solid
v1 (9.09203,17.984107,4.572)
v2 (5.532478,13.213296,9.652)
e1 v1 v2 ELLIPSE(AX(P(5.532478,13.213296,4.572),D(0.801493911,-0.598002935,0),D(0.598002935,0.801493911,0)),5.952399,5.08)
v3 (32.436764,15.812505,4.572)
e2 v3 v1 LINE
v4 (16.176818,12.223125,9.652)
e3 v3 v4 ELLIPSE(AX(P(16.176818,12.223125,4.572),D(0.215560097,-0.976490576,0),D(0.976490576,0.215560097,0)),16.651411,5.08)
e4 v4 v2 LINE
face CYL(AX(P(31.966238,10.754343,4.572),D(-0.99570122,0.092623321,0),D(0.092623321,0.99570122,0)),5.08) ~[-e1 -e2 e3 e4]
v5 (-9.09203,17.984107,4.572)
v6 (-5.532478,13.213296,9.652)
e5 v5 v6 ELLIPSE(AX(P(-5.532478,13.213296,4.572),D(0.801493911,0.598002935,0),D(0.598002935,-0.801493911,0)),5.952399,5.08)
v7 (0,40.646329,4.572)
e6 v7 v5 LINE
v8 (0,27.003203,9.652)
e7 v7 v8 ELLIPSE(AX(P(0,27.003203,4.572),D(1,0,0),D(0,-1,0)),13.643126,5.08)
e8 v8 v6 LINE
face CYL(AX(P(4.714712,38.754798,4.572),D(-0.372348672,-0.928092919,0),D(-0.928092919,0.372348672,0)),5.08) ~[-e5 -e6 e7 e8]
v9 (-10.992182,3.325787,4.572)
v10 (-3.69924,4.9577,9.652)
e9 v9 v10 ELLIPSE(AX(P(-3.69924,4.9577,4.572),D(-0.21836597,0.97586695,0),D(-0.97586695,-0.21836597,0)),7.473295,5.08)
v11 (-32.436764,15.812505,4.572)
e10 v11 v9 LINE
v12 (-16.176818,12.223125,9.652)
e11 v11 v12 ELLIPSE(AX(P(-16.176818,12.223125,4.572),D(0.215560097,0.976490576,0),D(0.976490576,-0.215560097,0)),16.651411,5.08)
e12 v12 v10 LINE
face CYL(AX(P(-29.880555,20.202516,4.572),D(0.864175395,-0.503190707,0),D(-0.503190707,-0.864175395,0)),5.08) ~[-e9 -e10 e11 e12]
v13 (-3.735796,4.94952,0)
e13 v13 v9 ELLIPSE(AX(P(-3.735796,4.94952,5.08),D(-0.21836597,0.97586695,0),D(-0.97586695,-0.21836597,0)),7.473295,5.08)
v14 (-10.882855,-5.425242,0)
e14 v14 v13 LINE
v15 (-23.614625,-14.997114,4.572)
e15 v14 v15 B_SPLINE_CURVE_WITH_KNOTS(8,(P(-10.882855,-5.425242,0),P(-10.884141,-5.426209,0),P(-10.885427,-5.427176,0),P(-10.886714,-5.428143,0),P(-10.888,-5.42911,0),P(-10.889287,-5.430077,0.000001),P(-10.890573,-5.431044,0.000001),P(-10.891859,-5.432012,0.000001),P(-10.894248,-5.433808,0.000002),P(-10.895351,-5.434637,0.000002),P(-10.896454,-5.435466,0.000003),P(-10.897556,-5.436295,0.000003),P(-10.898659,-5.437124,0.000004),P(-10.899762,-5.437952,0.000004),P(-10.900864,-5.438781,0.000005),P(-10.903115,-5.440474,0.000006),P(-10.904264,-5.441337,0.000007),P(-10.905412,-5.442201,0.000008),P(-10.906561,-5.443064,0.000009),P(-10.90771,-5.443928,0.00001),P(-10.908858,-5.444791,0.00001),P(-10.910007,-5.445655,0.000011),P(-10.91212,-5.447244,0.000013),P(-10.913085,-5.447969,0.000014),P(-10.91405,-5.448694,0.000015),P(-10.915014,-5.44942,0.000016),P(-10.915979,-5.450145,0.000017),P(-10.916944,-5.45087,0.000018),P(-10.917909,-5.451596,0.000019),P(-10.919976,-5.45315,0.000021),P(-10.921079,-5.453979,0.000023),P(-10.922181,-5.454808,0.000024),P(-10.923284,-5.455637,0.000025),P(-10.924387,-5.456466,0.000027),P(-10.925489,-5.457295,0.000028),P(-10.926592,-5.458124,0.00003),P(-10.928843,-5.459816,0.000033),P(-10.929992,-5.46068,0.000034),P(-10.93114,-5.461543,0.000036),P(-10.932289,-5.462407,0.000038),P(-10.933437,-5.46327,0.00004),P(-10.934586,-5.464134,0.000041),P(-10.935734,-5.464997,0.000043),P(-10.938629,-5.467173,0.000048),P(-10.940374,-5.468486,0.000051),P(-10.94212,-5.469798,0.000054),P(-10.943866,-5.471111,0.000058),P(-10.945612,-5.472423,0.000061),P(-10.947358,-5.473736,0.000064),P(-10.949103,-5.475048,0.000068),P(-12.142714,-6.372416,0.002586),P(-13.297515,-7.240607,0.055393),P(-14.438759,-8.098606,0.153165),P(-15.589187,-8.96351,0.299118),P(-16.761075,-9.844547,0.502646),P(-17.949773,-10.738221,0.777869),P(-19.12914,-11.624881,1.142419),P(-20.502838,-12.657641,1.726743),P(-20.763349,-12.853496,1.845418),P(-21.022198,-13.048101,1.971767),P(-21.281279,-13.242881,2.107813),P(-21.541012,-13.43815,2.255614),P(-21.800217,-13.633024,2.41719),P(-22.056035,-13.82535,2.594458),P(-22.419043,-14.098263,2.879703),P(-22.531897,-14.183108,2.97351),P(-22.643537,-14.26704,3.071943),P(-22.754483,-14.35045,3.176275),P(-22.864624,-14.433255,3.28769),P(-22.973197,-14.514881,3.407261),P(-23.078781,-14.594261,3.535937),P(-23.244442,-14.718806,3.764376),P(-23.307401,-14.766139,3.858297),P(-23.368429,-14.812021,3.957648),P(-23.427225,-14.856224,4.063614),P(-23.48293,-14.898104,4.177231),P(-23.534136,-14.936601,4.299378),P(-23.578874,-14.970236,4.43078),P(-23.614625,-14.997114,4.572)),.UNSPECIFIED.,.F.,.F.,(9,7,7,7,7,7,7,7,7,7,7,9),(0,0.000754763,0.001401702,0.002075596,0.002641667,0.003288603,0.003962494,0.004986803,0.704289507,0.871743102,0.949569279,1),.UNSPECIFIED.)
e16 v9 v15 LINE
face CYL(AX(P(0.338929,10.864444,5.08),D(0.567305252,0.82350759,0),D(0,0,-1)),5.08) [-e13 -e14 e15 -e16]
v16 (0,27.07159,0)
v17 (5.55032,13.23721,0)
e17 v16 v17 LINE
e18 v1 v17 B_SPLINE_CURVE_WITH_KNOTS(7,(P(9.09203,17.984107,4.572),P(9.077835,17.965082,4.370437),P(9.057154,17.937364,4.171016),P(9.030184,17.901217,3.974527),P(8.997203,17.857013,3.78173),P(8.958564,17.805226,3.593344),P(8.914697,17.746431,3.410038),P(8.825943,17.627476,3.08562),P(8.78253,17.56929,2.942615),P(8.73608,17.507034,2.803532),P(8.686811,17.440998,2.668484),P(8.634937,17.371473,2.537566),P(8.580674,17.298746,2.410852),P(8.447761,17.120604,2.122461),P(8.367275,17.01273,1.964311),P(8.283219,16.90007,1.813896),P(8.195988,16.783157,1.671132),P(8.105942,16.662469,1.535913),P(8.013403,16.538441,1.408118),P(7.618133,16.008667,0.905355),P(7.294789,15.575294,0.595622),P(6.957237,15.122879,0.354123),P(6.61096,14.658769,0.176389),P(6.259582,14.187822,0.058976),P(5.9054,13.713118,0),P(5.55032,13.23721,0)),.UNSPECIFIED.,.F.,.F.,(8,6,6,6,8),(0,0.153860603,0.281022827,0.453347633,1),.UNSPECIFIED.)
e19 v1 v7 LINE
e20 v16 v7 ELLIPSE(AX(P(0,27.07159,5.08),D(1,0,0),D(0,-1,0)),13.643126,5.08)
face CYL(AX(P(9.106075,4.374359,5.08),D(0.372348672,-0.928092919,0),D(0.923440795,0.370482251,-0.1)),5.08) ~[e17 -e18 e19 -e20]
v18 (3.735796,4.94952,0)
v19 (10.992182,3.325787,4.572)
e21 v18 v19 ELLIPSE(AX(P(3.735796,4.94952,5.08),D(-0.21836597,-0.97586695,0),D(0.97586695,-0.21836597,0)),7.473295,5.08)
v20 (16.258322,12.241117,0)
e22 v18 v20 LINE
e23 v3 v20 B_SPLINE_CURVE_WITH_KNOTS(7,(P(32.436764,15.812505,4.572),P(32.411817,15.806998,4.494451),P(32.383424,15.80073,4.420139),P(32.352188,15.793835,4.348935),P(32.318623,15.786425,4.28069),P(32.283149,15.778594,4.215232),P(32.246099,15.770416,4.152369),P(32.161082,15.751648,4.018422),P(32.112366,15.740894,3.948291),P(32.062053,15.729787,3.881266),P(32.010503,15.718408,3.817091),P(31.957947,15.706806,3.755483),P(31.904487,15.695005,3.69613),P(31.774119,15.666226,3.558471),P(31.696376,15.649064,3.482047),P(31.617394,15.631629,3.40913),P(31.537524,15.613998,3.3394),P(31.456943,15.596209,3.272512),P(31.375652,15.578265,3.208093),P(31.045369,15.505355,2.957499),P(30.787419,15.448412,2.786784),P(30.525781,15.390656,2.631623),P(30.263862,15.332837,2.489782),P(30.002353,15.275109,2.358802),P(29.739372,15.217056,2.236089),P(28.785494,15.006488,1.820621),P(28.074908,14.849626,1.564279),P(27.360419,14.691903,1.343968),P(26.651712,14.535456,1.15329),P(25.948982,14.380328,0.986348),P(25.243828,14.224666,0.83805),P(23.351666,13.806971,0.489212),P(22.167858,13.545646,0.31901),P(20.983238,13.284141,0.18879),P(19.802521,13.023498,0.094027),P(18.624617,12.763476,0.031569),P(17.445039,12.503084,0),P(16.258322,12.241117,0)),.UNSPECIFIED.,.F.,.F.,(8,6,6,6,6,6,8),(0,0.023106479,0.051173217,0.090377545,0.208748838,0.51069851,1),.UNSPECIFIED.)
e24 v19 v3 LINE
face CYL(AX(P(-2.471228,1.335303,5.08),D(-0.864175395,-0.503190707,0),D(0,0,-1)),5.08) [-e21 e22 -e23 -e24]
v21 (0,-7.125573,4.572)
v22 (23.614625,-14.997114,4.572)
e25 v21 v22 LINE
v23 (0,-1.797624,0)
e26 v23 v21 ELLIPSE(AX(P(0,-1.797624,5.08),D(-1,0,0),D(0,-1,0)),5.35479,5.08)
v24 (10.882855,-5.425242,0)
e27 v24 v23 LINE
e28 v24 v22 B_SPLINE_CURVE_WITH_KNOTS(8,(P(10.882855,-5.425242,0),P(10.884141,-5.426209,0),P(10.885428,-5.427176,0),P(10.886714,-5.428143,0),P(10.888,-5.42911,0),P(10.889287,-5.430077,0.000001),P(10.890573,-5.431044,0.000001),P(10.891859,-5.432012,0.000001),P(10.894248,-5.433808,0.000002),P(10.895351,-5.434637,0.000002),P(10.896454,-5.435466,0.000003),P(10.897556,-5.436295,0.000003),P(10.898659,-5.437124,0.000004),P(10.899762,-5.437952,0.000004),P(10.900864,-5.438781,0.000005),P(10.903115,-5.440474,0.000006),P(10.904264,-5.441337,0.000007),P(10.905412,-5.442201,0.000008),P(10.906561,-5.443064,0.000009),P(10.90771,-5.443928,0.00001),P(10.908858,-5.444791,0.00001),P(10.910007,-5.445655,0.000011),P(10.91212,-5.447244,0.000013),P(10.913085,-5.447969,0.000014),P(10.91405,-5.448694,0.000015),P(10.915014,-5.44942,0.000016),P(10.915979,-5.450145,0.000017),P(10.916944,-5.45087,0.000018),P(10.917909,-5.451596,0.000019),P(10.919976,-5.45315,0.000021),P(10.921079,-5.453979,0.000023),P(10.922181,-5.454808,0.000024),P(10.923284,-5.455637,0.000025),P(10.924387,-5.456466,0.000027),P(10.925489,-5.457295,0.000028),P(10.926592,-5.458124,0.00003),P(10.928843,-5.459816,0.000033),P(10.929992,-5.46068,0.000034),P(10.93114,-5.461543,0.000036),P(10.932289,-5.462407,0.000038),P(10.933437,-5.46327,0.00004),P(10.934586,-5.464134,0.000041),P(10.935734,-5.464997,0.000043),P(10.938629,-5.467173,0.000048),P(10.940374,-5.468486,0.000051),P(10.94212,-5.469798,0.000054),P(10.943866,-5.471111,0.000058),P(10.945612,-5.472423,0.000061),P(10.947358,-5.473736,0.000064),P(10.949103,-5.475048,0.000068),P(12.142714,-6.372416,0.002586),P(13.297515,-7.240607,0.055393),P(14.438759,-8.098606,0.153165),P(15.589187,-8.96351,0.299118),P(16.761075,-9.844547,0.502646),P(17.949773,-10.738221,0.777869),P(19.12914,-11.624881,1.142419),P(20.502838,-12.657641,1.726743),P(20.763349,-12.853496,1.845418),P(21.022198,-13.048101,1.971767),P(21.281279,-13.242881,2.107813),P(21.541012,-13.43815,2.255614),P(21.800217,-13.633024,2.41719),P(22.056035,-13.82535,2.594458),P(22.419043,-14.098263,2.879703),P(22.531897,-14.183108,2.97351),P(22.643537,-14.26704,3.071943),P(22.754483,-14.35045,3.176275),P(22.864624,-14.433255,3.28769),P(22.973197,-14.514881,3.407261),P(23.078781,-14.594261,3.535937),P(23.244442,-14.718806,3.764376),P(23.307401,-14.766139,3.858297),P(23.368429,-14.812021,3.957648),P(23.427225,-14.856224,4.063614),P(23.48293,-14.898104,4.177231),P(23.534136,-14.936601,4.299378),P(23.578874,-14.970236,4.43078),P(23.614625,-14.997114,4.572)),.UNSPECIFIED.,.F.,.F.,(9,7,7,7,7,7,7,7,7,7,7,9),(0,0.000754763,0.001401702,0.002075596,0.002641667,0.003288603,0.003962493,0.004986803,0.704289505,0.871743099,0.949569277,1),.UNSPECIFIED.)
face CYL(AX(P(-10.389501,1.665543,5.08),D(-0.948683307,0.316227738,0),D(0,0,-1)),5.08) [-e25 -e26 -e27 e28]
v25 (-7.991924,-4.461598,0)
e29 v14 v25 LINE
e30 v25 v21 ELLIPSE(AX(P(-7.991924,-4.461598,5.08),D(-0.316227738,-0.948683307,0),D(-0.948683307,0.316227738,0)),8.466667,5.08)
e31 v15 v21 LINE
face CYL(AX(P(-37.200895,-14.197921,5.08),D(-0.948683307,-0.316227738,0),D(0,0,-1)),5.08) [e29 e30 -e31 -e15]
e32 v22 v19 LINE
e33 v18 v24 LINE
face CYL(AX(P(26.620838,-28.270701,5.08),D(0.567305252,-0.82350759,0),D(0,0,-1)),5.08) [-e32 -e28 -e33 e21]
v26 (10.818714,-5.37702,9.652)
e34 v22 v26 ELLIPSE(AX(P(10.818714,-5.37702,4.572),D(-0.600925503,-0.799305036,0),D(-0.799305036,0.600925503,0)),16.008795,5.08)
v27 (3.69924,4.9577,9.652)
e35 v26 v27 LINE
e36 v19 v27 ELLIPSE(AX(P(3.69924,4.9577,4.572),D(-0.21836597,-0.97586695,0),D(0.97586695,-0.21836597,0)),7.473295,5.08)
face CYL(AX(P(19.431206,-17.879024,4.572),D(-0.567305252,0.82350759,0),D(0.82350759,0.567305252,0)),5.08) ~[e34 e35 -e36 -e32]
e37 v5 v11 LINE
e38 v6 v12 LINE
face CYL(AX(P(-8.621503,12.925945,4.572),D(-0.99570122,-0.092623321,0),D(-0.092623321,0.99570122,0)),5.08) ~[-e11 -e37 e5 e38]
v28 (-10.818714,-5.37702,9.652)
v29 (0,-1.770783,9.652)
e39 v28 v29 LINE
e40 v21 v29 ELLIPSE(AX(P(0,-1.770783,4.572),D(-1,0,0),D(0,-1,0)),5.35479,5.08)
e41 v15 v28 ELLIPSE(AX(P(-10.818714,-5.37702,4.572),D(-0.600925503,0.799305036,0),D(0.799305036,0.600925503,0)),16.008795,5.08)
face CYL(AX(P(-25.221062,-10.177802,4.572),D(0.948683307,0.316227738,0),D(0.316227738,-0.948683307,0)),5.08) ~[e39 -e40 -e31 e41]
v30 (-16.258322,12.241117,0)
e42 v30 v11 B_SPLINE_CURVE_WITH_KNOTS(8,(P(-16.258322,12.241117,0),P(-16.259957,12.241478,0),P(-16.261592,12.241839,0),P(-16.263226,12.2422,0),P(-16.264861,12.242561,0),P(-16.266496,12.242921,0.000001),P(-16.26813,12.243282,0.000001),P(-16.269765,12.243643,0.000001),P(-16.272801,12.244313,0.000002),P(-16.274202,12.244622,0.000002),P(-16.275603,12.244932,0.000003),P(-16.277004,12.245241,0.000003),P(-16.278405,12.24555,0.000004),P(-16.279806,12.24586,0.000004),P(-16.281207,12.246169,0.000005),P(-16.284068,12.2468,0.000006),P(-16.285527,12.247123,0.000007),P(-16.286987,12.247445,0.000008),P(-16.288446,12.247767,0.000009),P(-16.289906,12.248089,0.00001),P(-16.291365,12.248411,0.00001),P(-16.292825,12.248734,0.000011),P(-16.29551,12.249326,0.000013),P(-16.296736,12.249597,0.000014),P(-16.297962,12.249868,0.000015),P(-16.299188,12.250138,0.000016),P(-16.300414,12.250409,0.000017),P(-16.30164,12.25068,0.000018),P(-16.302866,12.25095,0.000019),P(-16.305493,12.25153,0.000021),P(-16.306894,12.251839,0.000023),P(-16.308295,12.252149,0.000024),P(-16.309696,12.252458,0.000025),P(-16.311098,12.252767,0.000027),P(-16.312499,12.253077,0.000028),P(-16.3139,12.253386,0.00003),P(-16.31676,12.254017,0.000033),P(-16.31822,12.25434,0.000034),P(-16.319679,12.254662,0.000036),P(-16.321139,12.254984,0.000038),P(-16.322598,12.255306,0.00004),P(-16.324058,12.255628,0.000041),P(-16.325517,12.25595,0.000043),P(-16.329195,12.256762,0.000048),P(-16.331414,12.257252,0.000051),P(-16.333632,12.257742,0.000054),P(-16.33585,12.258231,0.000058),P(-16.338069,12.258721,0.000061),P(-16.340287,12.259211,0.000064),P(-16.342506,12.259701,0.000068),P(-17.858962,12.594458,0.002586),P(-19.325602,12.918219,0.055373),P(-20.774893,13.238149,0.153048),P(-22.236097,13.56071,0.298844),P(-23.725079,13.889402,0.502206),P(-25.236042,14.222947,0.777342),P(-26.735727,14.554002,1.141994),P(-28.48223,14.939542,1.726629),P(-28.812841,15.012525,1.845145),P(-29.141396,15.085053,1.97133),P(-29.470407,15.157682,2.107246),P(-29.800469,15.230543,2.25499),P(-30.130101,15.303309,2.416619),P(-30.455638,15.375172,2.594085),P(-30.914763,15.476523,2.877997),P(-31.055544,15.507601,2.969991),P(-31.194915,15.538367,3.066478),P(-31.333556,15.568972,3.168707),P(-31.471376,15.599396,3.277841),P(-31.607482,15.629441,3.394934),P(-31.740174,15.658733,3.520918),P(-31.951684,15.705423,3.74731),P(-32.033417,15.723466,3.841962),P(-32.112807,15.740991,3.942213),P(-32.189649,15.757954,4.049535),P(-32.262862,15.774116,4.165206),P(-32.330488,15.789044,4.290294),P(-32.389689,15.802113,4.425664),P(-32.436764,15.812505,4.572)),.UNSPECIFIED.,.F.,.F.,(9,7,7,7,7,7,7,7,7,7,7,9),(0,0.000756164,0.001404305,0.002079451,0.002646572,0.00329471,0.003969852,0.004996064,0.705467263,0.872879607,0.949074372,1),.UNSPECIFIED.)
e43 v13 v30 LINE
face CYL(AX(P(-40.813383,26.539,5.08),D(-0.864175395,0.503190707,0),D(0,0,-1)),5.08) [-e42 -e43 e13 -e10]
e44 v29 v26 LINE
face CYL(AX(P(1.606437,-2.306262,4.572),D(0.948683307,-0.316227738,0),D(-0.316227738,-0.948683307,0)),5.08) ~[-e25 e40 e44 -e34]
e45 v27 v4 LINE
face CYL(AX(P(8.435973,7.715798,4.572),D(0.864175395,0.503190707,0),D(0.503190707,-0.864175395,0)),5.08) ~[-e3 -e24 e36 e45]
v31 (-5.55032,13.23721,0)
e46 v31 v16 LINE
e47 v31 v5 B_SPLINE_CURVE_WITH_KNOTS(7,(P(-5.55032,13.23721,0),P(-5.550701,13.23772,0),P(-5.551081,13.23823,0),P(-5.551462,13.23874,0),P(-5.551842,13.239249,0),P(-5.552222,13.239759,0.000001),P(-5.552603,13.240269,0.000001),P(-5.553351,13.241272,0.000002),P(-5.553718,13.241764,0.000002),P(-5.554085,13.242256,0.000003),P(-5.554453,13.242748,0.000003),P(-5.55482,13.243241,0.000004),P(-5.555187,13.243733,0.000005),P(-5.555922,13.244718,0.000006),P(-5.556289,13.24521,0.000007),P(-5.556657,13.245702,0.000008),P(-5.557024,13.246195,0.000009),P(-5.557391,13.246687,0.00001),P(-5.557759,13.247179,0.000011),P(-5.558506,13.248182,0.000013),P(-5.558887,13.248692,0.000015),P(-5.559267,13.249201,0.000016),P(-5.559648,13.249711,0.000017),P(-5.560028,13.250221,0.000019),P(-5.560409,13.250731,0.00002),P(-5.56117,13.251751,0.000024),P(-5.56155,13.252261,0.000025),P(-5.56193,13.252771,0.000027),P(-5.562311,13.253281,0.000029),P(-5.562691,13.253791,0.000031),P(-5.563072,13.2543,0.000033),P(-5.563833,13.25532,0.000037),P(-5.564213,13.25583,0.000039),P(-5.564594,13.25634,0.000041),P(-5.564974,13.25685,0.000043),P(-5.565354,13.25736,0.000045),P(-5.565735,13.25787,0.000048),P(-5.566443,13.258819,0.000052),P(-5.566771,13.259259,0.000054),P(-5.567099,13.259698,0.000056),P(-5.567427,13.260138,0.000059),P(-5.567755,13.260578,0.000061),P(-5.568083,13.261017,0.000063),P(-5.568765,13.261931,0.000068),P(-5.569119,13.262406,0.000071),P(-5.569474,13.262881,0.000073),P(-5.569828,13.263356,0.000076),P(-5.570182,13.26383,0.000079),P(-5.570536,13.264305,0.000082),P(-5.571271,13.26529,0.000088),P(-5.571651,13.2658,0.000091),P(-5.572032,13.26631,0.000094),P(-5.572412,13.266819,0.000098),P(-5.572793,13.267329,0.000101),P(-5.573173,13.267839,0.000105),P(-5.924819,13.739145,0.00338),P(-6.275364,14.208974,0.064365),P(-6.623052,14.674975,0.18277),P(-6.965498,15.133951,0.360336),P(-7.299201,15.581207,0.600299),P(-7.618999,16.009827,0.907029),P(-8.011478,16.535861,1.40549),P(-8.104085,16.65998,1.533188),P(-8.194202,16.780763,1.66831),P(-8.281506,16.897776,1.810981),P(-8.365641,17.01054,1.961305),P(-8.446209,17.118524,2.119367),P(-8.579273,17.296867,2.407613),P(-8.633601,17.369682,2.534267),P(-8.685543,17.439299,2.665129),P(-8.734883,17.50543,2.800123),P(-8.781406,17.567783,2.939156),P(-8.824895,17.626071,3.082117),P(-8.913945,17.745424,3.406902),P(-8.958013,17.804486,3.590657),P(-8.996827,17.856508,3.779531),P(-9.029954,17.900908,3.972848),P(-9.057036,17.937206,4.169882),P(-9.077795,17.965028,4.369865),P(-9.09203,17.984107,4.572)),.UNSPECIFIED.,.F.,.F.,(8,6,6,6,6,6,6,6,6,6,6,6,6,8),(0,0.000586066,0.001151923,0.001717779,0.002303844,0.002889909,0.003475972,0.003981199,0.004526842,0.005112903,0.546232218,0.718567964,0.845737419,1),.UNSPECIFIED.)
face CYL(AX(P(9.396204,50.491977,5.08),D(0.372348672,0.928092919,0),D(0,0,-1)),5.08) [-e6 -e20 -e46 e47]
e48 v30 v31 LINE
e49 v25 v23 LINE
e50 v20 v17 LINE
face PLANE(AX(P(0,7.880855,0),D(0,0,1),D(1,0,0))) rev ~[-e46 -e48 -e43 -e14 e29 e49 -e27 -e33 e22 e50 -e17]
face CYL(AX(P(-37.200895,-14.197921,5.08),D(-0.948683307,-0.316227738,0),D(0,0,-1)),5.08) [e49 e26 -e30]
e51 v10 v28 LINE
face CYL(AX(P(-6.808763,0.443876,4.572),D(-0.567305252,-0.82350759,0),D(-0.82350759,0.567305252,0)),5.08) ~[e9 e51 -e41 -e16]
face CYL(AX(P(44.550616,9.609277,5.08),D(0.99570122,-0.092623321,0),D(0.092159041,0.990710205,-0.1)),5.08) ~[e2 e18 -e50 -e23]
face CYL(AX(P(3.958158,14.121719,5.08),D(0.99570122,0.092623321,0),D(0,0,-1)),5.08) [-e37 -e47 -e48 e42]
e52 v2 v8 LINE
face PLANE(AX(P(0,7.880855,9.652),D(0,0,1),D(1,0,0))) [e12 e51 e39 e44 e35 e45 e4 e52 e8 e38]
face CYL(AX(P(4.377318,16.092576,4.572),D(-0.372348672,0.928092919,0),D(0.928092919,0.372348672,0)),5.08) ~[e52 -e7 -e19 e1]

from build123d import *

# Parameters (mm, degrees)
F1_DEPTH      = 9.652
F2_R          = 5.08
F3_T4_DEPTH   = 48.7182027165
F3_T9_DEPTH   = 49.6907337444
F3_T14_DEPTH  = 49.6907337444
F3_T19_DEPTH  = 48.7182027165
F3_T24_DEPTH  = 50.0877618637
F3_T29_DEPTH  = 47.5225066811
F3_T34_DEPTH  = 50.1646809025
F3_T39_DEPTH  = 50.1646809025
F3_T44_DEPTH  = 47.5225066811
F3_T49_DEPTH  = 50.0877618637
F3_T55_DEPTH  = 49.6907337444
F3_T59_DEPTH  = 48.7182027165
F3_T66_DEPTH  = 49.6907337444
F3_T70_DEPTH  = 48.7182027165
F3_T77_DEPTH  = 50.0877618637
F3_T81_DEPTH  = 47.5225066811
F3_T88_DEPTH  = 50.1646809025
F3_T92_DEPTH  = 50.1646809025
F3_T99_DEPTH  = 47.5225066811
F3_T103_DEPTH = 50.0877618637


# Not quite as in the source:
# - a fillet or chamfer that OpenCascade refuses, or shapes differently, is made with other operations: its cross-section is extruded or revolved along the edge and cut away or added


with BuildPart() as f1:
    # F0 (on Top) → F1 (new body)
    with BuildSketch(Plane.XY):
        Polygon((9.0920295568, 17.9841070124), (0, 40.6463289496), (-9.0920295568, 17.9841070124), (-32.4367642404, 15.8125049123), (-10.9921818601, 3.3257867829), (-23.6146248879, -14.9971136204), (0, -7.1255727671), (23.6146248879, -14.9971136204), (10.9921818601, 3.3257867829), (32.4367642404, 15.8125049123), align=None)
    extrude(amount=F1_DEPTH)

    # F2
    f2_edges = [f1.edges().sort_by_distance(p)[0] for p in [
        (21.714473, 9.569146, 9.652),
        (17.303403, -5.835663, 9.652),
        (11.807312, -11.061343, 9.652),
        (-11.807312, -11.061343, 9.652),
        (-17.303403, -5.835663, 9.652),
        (-21.714473, 9.569146, 9.652),
        (-4.546015, 29.315218, 9.652),
        (4.546015, 29.315218, 9.652),
        (20.764397, 16.898306, 9.652),
        (-20.764397, 16.898306, 9.652),
    ]]
    fillet(f2_edges, radius=F2_R)

    # F3: fillet of radius 5.08 on 10 edges, made by hand


with BuildPart() as f3_tool2:
    # F3_s3 → F3_t4 (new body)
    with BuildSketch(Plane(origin=(43.2821955638, -4.026248662, 0), x_dir=(0, 0, 1), z_dir=(-0.9957012204, 0.0926233213, 0))):
        with BuildLine():
            ThreePointArc((4.572, 18.7489312754), (1.3125711686, 17.1021626927), (0, 13.6943950949))
            Line((0, 13.6943950949), (-0.1016, 13.6943950949))
            Line((-0.1016, 13.6943950949), (-0.1016, 18.7489312754))
            Line((-0.1016, 18.7489312754), (0, 18.8505312754))
            ThreePointArc((0, 18.8505312754), (2.286, 18.8505312754), (4.56184, 18.8500219991))
            Line((4.56184, 18.8500219991), (4.572, 18.7489312754))
        make_face()
    extrude(amount=F3_T4_DEPTH)

    split(bisect_by=Plane(origin=(14.046321235, 5.6353506813, 0), x_dir=(0, 0, 1), z_dir=(0.928092919, 0.3723486723, 0)), keep=Keep.TOP)


with BuildPart() as f1_1:
    add(f1.part)

    # F3_t1: cut F3_tool2
    add(f3_tool2.part, mode=Mode.SUBTRACT)


with BuildPart() as f3_tool7:
    # F3_s8 → F3_t9 (new body)
    with BuildSketch(Plane(origin=(-0.2491670879, 0.6210582369, 0), x_dir=(0, 0, 1), z_dir=(-0.3723486723, 0.928092919, 0))):
        with BuildLine():
            ThreePointArc((4.572, 15.1346066199), (1.3125711686, 13.4878380371), (0, 10.0800704394))
            Line((0, 10.0800704394), (-0.1016, 10.0800704394))
            Line((-0.1016, 10.0800704394), (-0.1016, 15.1346066199))
            Line((-0.1016, 15.1346066199), (0, 15.2362066199))
            ThreePointArc((0, 15.2362066199), (2.286, 15.2362066199), (4.56184, 15.2356973435))
            Line((4.56184, 15.2356973435), (4.572, 15.1346066199))
        make_face()
    extrude(amount=F3_T9_DEPTH)

    split(bisect_by=Plane(origin=(1.7365882856, 18.6683337526, 0), x_dir=(0, 0, 1), z_dir=(0.0926233213, 0.9957012204, 0)), keep=Keep.TOP)


with BuildPart() as f1_2:
    add(f1_1.part)

    # F3_t6: cut F3_tool7
    add(f3_tool7.part, mode=Mode.SUBTRACT)


with BuildPart() as f3_tool12:
    # F3_s13 → F3_t14 (new body)
    with BuildSketch(Plane(origin=(18.7514458253, 46.7386763625, 0), x_dir=(0, 0, 1), z_dir=(-0.3723486723, -0.928092919, 0))):
        with BuildLine():
            ThreePointArc((0, 10.0800704394), (1.3125711686, 13.4878380371), (4.572, 15.1346066199))
            Line((4.572, 15.1346066199), (4.56184, 15.2356973435))
            ThreePointArc((4.56184, 15.2356973435), (2.286, 15.2362066199), (0, 15.2362066199))
            Line((0, 15.2362066199), (-0.1016, 15.1346066199))
            Line((-0.1016, 15.1346066199), (-0.1016, 10.0800704394))
            Line((-0.1016, 10.0800704394), (0, 10.0800704394))
        make_face()
    extrude(amount=F3_T14_DEPTH)

    split(bisect_by=Plane(origin=(-1.7365882856, 18.6683337526, 0), x_dir=(0, 0, 1), z_dir=(-0.0926233213, 0.9957012204, 0)), keep=Keep.TOP)


with BuildPart() as f1_3:
    add(f1_2.part)

    # F3_t11: cut F3_tool12
    add(f3_tool12.part, mode=Mode.SUBTRACT)


with BuildPart() as f3_tool17:
    # F3_s18 → F3_t19 (new body)
    with BuildSketch(Plane(origin=(5.2265783378, 0.4861930816, 0), x_dir=(0, 0, 1), z_dir=(-0.9957012204, -0.0926233213, 0))):
        with BuildLine():
            ThreePointArc((0, 13.6943950949), (1.3125711686, 17.1021626927), (4.572, 18.7489312754))
            Line((4.572, 18.7489312754), (4.56184, 18.8500219991))
            ThreePointArc((4.56184, 18.8500219991), (2.286, 18.8505312754), (0, 18.8505312754))
            Line((0, 18.8505312754), (-0.1016, 18.7489312754))
            Line((-0.1016, 18.7489312754), (-0.1016, 13.6943950949))
            Line((-0.1016, 13.6943950949), (0, 13.6943950949))
        make_face()
    extrude(amount=F3_T19_DEPTH)

    split(bisect_by=Plane(origin=(-14.046321235, 5.6353506813, 0), x_dir=(0, 0, 1), z_dir=(-0.928092919, 0.3723486723, 0)), keep=Keep.TOP)


with BuildPart() as f1_4:
    add(f1_3.part)

    # F3_t16: cut F3_tool17
    add(f3_tool17.part, mode=Mode.SUBTRACT)


with BuildPart() as f3_tool22:
    # F3_s23 → F3_t24 (new body)
    with BuildSketch(Plane(origin=(-42.019750379, 24.4671950025, 0), x_dir=(0, 0, 1), z_dir=(0.8641753945, -0.5031907068, 0))):
        with BuildLine():
            ThreePointArc((0, -2.3974355258), (1.3125711686, 1.0103320719), (4.572, 2.6571006547))
            Line((4.572, 2.6571006547), (4.56184, 2.7581913783))
            ThreePointArc((4.56184, 2.7581913783), (2.286, 2.7587006547), (0, 2.7587006547))
            Line((0, 2.7587006547), (-0.1016, 2.6571006547))
            Line((-0.1016, 2.6571006547), (-0.1016, -2.3974355258))
            Line((-0.1016, -2.3974355258), (0, -2.3974355258))
        make_face()
    extrude(amount=F3_T24_DEPTH)

    split(bisect_by=Plane(origin=(-9.0082519421, 6.2056849307, 0), x_dir=(0, 0, 1), z_dir=(-0.8235075899, 0.5673052523, 0)), keep=Keep.TOP)


with BuildPart() as f1_5:
    add(f1_4.part)

    # F3_t21: cut F3_tool22
    add(f3_tool22.part, mode=Mode.SUBTRACT)


with BuildPart() as f3_tool27:
    # F3_s28 → F3_t29 (new body)
    with BuildSketch(Plane(origin=(5.1847323903, 7.5262241228, 0), x_dir=(0, 0, 1), z_dir=(-0.5673052523, -0.8235075899, 0))):
        with BuildLine():
            ThreePointArc((0, 5.8843453213), (1.3125711686, 9.292112919), (4.572, 10.9388815018))
            Line((4.572, 10.9388815018), (4.56184, 11.0399722254))
            ThreePointArc((4.56184, 11.0399722254), (2.286, 11.0404815018), (0, 11.0404815018))
            Line((0, 11.0404815018), (-0.1016, 10.9388815018))
            Line((-0.1016, 10.9388815018), (-0.1016, 5.8843453213))
            Line((-0.1016, 5.8843453213), (0, 5.8843453213))
        make_face()
    extrude(amount=F3_T29_DEPTH)

    split(bisect_by=Plane(origin=(-1.3370283566, -2.2962010066, 0), x_dir=(0, 0, 1), z_dir=(-0.5031907068, -0.8641753945, 0)), keep=Keep.TOP)


with BuildPart() as f1_6:
    add(f1_5.part)

    # F3_t26: cut F3_tool27
    add(f3_tool27.part, mode=Mode.SUBTRACT)


with BuildPart() as f3_tool32:
    # F3_s33 → F3_t34 (new body)
    with BuildSketch(Plane(origin=(-37.7401818022, -12.5800593605, 0), x_dir=(0, 0, 1), z_dir=(0.9486833074, 0.316227738, 0))):
        with BuildLine():
            ThreePointArc((0, 1.7053757593), (1.3125711686, 5.1131433571), (4.572, 6.7599119398))
            Line((4.572, 6.7599119398), (4.56184, 6.8610026635))
            ThreePointArc((4.56184, 6.8610026635), (2.286, 6.8615119398), (0, 6.8615119398))
            Line((0, 6.8615119398), (-0.1016, 6.7599119398))
            Line((-0.1016, 6.7599119398), (-0.1016, 1.7053757593))
            Line((-0.1016, 1.7053757593), (0, 1.7053757593))
        make_face()
    extrude(amount=F3_T34_DEPTH)

    split(bisect_by=Plane(origin=(-2.1376716615, -6.4130156168, 0), x_dir=(0, 0, 1), z_dir=(-0.316227738, -0.9486833074, 0)), keep=Keep.TOP)


with BuildPart() as f1_7:
    add(f1_6.part)

    # F3_t31: cut F3_tool32
    add(f3_tool32.part, mode=Mode.SUBTRACT)


with BuildPart() as f3_tool37:
    # F3_s38 → F3_t39 (new body)
    with BuildSketch(Plane(origin=(-9.8502135912, 3.2834042067, 0), x_dir=(0, 0, 1), z_dir=(0.9486833074, -0.316227738, 0))):
        with BuildLine():
            ThreePointArc((0, 1.7053757593), (1.3125711686, 5.1131433571), (4.572, 6.7599119398))
            Line((4.572, 6.7599119398), (4.56184, 6.8610026635))
            ThreePointArc((4.56184, 6.8610026635), (2.286, 6.8615119398), (0, 6.8615119398))
            Line((0, 6.8615119398), (-0.1016, 6.7599119398))
            Line((-0.1016, 6.7599119398), (-0.1016, 1.7053757593))
            Line((-0.1016, 1.7053757593), (0, 1.7053757593))
        make_face()
    extrude(amount=F3_T39_DEPTH)

    split(bisect_by=Plane(origin=(2.1376716615, -6.4130156168, 0), x_dir=(0, 0, 1), z_dir=(0.316227738, -0.9486833074, 0)), keep=Keep.TOP)


with BuildPart() as f1_8:
    add(f1_7.part)

    # F3_t36: cut F3_tool37
    add(f3_tool37.part, mode=Mode.SUBTRACT)


with BuildPart() as f3_tool42:
    # F3_s43 → F3_t44 (new body)
    with BuildSketch(Plane(origin=(21.7750352542, -31.6089208215, 0), x_dir=(0, 0, 1), z_dir=(-0.5673052523, 0.8235075899, 0))):
        with BuildLine():
            ThreePointArc((0, 5.8843453213), (1.3125711686, 9.292112919), (4.572, 10.9388815018))
            Line((4.572, 10.9388815018), (4.56184, 11.0399722254))
            ThreePointArc((4.56184, 11.0399722254), (2.286, 11.0404815018), (0, 11.0404815018))
            Line((0, 11.0404815018), (-0.1016, 10.9388815018))
            Line((-0.1016, 10.9388815018), (-0.1016, 5.8843453213))
            Line((-0.1016, 5.8843453213), (0, 5.8843453213))
        make_face()
    extrude(amount=F3_T44_DEPTH)

    split(bisect_by=Plane(origin=(1.3370283566, -2.2962010066, 0), x_dir=(0, 0, 1), z_dir=(0.5031907068, -0.8641753945, 0)), keep=Keep.TOP)


with BuildPart() as f1_9:
    add(f1_8.part)

    # F3_t41: cut F3_tool42
    add(f3_tool42.part, mode=Mode.SUBTRACT)


with BuildPart() as f3_tool47:
    # F3_s48 → F3_t49 (new body)
    with BuildSketch(Plane(origin=(-1.2648609916, -0.7365012941, 0), x_dir=(0, 0, 1), z_dir=(0.8641753945, 0.5031907068, 0))):
        with BuildLine():
            ThreePointArc((0, -2.3974355258), (1.3125711686, 1.0103320719), (4.572, 2.6571006547))
            Line((4.572, 2.6571006547), (4.56184, 2.7581913783))
            ThreePointArc((4.56184, 2.7581913783), (2.286, 2.7587006547), (0, 2.7587006547))
            Line((0, 2.7587006547), (-0.1016, 2.6571006547))
            Line((-0.1016, 2.6571006547), (-0.1016, -2.3974355258))
            Line((-0.1016, -2.3974355258), (0, -2.3974355258))
        make_face()
    extrude(amount=F3_T49_DEPTH)

    split(bisect_by=Plane(origin=(9.0082519421, 6.2056849307, 0), x_dir=(0, 0, 1), z_dir=(0.8235075899, 0.5673052523, 0)), keep=Keep.TOP)


with BuildPart() as f1_10:
    add(f1_9.part)

    # F3_t46: cut F3_tool47
    add(f3_tool47.part, mode=Mode.SUBTRACT)


with BuildPart() as f3_tool53:
    # F3_s54 → F3_t55 (new body)
    with BuildSketch(Plane(origin=(-0.2491670879, 0.6210582369, 0), x_dir=(0, 0, 1), z_dir=(-0.3723486723, 0.928092919, 0))):
        with BuildLine():
            ThreePointArc((4.572, 15.1346066199), (1.3125711686, 13.4878380371), (0, 10.0800704394))
            Line((0, 10.0800704394), (-0.1016, 10.0800704394))
            Line((-0.1016, 10.0800704394), (-0.1016, 15.1346066199))
            Line((-0.1016, 15.1346066199), (0, 15.2362066199))
            ThreePointArc((0, 15.2362066199), (2.286, 15.2362066199), (4.56184, 15.2356973435))
            Line((4.56184, 15.2356973435), (4.572, 15.1346066199))
        make_face()
    extrude(amount=F3_T55_DEPTH)

    split(bisect_by=Plane(origin=(1.7365882856, 18.6683337526, 0), x_dir=(0, 0, 1), z_dir=(-0.0926233213, -0.9957012204, 0)), keep=Keep.TOP)


with BuildPart() as f3_tool57:
    # F3_s58 → F3_t59 (new body)
    with BuildSketch(Plane(origin=(43.2821955638, -4.026248662, 0), x_dir=(0, 0, 1), z_dir=(-0.9957012204, 0.0926233213, 0))):
        with BuildLine():
            ThreePointArc((4.572, 18.7489312754), (1.3125711686, 17.1021626927), (0, 13.6943950949))
            Line((0, 13.6943950949), (-0.1016, 13.6943950949))
            Line((-0.1016, 13.6943950949), (-0.1016, 18.7489312754))
            Line((-0.1016, 18.7489312754), (0, 18.8505312754))
            ThreePointArc((0, 18.8505312754), (2.286, 18.8505312754), (4.56184, 18.8500219991))
            Line((4.56184, 18.8500219991), (4.572, 18.7489312754))
        make_face()
    extrude(amount=F3_T59_DEPTH)

    split(bisect_by=Plane(origin=(14.046321235, 5.6353506813, 0), x_dir=(0, 0, 1), z_dir=(-0.928092919, -0.3723486723, 0)), keep=Keep.TOP)


with BuildPart() as f3_tool53_1:
    add(f3_tool53.part)

    # F3_t61: intersect F3_tool57
    add(f3_tool57.part, mode=Mode.INTERSECT)


with BuildPart() as f1_11:
    add(f1_10.part)

    # F3_t51: cut F3_tool53
    add(f3_tool53_1.part, mode=Mode.SUBTRACT)


with BuildPart() as f3_tool64:
    # F3_s65 → F3_t66 (new body)
    with BuildSketch(Plane(origin=(18.7514458253, 46.7386763625, 0), x_dir=(0, 0, 1), z_dir=(-0.3723486723, -0.928092919, 0))):
        with BuildLine():
            ThreePointArc((0, 10.0800704394), (1.3125711686, 13.4878380371), (4.572, 15.1346066199))
            Line((4.572, 15.1346066199), (4.56184, 15.2356973435))
            ThreePointArc((4.56184, 15.2356973435), (2.286, 15.2362066199), (0, 15.2362066199))
            Line((0, 15.2362066199), (-0.1016, 15.1346066199))
            Line((-0.1016, 15.1346066199), (-0.1016, 10.0800704394))
            Line((-0.1016, 10.0800704394), (0, 10.0800704394))
        make_face()
    extrude(amount=F3_T66_DEPTH)

    split(bisect_by=Plane(origin=(-1.7365882856, 18.6683337526, 0), x_dir=(0, 0, 1), z_dir=(0.0926233213, -0.9957012204, 0)), keep=Keep.TOP)


with BuildPart() as f3_tool68:
    # F3_s69 → F3_t70 (new body)
    with BuildSketch(Plane(origin=(5.2265783378, 0.4861930816, 0), x_dir=(0, 0, 1), z_dir=(-0.9957012204, -0.0926233213, 0))):
        with BuildLine():
            ThreePointArc((0, 13.6943950949), (1.3125711686, 17.1021626927), (4.572, 18.7489312754))
            Line((4.572, 18.7489312754), (4.56184, 18.8500219991))
            ThreePointArc((4.56184, 18.8500219991), (2.286, 18.8505312754), (0, 18.8505312754))
            Line((0, 18.8505312754), (-0.1016, 18.7489312754))
            Line((-0.1016, 18.7489312754), (-0.1016, 13.6943950949))
            Line((-0.1016, 13.6943950949), (0, 13.6943950949))
        make_face()
    extrude(amount=F3_T70_DEPTH)

    split(bisect_by=Plane(origin=(-14.046321235, 5.6353506813, 0), x_dir=(0, 0, 1), z_dir=(0.928092919, -0.3723486723, 0)), keep=Keep.TOP)


with BuildPart() as f3_tool64_1:
    add(f3_tool64.part)

    # F3_t72: intersect F3_tool68
    add(f3_tool68.part, mode=Mode.INTERSECT)


with BuildPart() as f1_12:
    add(f1_11.part)

    # F3_t62: cut F3_tool64
    add(f3_tool64_1.part, mode=Mode.SUBTRACT)


with BuildPart() as f3_tool75:
    # F3_s76 → F3_t77 (new body)
    with BuildSketch(Plane(origin=(-42.019750379, 24.4671950025, 0), x_dir=(0, 0, 1), z_dir=(0.8641753945, -0.5031907068, 0))):
        with BuildLine():
            ThreePointArc((0, -2.3974355258), (1.3125711686, 1.0103320719), (4.572, 2.6571006547))
            Line((4.572, 2.6571006547), (4.56184, 2.7581913783))
            ThreePointArc((4.56184, 2.7581913783), (2.286, 2.7587006547), (0, 2.7587006547))
            Line((0, 2.7587006547), (-0.1016, 2.6571006547))
            Line((-0.1016, 2.6571006547), (-0.1016, -2.3974355258))
            Line((-0.1016, -2.3974355258), (0, -2.3974355258))
        make_face()
    extrude(amount=F3_T77_DEPTH)

    split(bisect_by=Plane(origin=(-9.0082519421, 6.2056849307, 0), x_dir=(0, 0, 1), z_dir=(0.8235075899, -0.5673052523, 0)), keep=Keep.TOP)


with BuildPart() as f3_tool79:
    # F3_s80 → F3_t81 (new body)
    with BuildSketch(Plane(origin=(5.1847323903, 7.5262241228, 0), x_dir=(0, 0, 1), z_dir=(-0.5673052523, -0.8235075899, 0))):
        with BuildLine():
            ThreePointArc((0, 5.8843453213), (1.3125711686, 9.292112919), (4.572, 10.9388815018))
            Line((4.572, 10.9388815018), (4.56184, 11.0399722254))
            ThreePointArc((4.56184, 11.0399722254), (2.286, 11.0404815018), (0, 11.0404815018))
            Line((0, 11.0404815018), (-0.1016, 10.9388815018))
            Line((-0.1016, 10.9388815018), (-0.1016, 5.8843453213))
            Line((-0.1016, 5.8843453213), (0, 5.8843453213))
        make_face()
    extrude(amount=F3_T81_DEPTH)

    split(bisect_by=Plane(origin=(-1.3370283566, -2.2962010066, 0), x_dir=(0, 0, 1), z_dir=(0.5031907068, 0.8641753945, 0)), keep=Keep.TOP)


with BuildPart() as f3_tool75_1:
    add(f3_tool75.part)

    # F3_t83: intersect F3_tool79
    add(f3_tool79.part, mode=Mode.INTERSECT)


with BuildPart() as f1_13:
    add(f1_12.part)

    # F3_t73: cut F3_tool75
    add(f3_tool75_1.part, mode=Mode.SUBTRACT)


with BuildPart() as f3_tool86:
    # F3_s87 → F3_t88 (new body)
    with BuildSketch(Plane(origin=(-37.7401818022, -12.5800593605, 0), x_dir=(0, 0, 1), z_dir=(0.9486833074, 0.316227738, 0))):
        with BuildLine():
            ThreePointArc((0, 1.7053757593), (1.3125711686, 5.1131433571), (4.572, 6.7599119398))
            Line((4.572, 6.7599119398), (4.56184, 6.8610026635))
            ThreePointArc((4.56184, 6.8610026635), (2.286, 6.8615119398), (0, 6.8615119398))
            Line((0, 6.8615119398), (-0.1016, 6.7599119398))
            Line((-0.1016, 6.7599119398), (-0.1016, 1.7053757593))
            Line((-0.1016, 1.7053757593), (0, 1.7053757593))
        make_face()
    extrude(amount=F3_T88_DEPTH)

    split(bisect_by=Plane(origin=(-2.1376716615, -6.4130156168, 0), x_dir=(0, 0, 1), z_dir=(0.316227738, 0.9486833074, 0)), keep=Keep.TOP)


with BuildPart() as f3_tool90:
    # F3_s91 → F3_t92 (new body)
    with BuildSketch(Plane(origin=(-9.8502135912, 3.2834042067, 0), x_dir=(0, 0, 1), z_dir=(0.9486833074, -0.316227738, 0))):
        with BuildLine():
            ThreePointArc((0, 1.7053757593), (1.3125711686, 5.1131433571), (4.572, 6.7599119398))
            Line((4.572, 6.7599119398), (4.56184, 6.8610026635))
            ThreePointArc((4.56184, 6.8610026635), (2.286, 6.8615119398), (0, 6.8615119398))
            Line((0, 6.8615119398), (-0.1016, 6.7599119398))
            Line((-0.1016, 6.7599119398), (-0.1016, 1.7053757593))
            Line((-0.1016, 1.7053757593), (0, 1.7053757593))
        make_face()
    extrude(amount=F3_T92_DEPTH)

    split(bisect_by=Plane(origin=(2.1376716615, -6.4130156168, 0), x_dir=(0, 0, 1), z_dir=(-0.316227738, 0.9486833074, 0)), keep=Keep.TOP)


with BuildPart() as f3_tool86_1:
    add(f3_tool86.part)

    # F3_t94: intersect F3_tool90
    add(f3_tool90.part, mode=Mode.INTERSECT)


with BuildPart() as f1_14:
    add(f1_13.part)

    # F3_t84: cut F3_tool86
    add(f3_tool86_1.part, mode=Mode.SUBTRACT)


with BuildPart() as f3_tool97:
    # F3_s98 → F3_t99 (new body)
    with BuildSketch(Plane(origin=(21.7750352542, -31.6089208215, 0), x_dir=(0, 0, 1), z_dir=(-0.5673052523, 0.8235075899, 0))):
        with BuildLine():
            ThreePointArc((0, 5.8843453213), (1.3125711686, 9.292112919), (4.572, 10.9388815018))
            Line((4.572, 10.9388815018), (4.56184, 11.0399722254))
            ThreePointArc((4.56184, 11.0399722254), (2.286, 11.0404815018), (0, 11.0404815018))
            Line((0, 11.0404815018), (-0.1016, 10.9388815018))
            Line((-0.1016, 10.9388815018), (-0.1016, 5.8843453213))
            Line((-0.1016, 5.8843453213), (0, 5.8843453213))
        make_face()
    extrude(amount=F3_T99_DEPTH)

    split(bisect_by=Plane(origin=(1.3370283566, -2.2962010066, 0), x_dir=(0, 0, 1), z_dir=(-0.5031907068, 0.8641753945, 0)), keep=Keep.TOP)


with BuildPart() as f3_tool101:
    # F3_s102 → F3_t103 (new body)
    with BuildSketch(Plane(origin=(-1.2648609916, -0.7365012941, 0), x_dir=(0, 0, 1), z_dir=(0.8641753945, 0.5031907068, 0))):
        with BuildLine():
            ThreePointArc((0, -2.3974355258), (1.3125711686, 1.0103320719), (4.572, 2.6571006547))
            Line((4.572, 2.6571006547), (4.56184, 2.7581913783))
            ThreePointArc((4.56184, 2.7581913783), (2.286, 2.7587006547), (0, 2.7587006547))
            Line((0, 2.7587006547), (-0.1016, 2.6571006547))
            Line((-0.1016, 2.6571006547), (-0.1016, -2.3974355258))
            Line((-0.1016, -2.3974355258), (0, -2.3974355258))
        make_face()
    extrude(amount=F3_T103_DEPTH)

    split(bisect_by=Plane(origin=(9.0082519421, 6.2056849307, 0), x_dir=(0, 0, 1), z_dir=(-0.8235075899, -0.5673052523, 0)), keep=Keep.TOP)


with BuildPart() as f3_tool97_1:
    add(f3_tool97.part)

    # F3_t105: intersect F3_tool101
    add(f3_tool101.part, mode=Mode.INTERSECT)


with BuildPart() as f1_15:
    add(f1_14.part)

    # F3_t95: cut F3_tool97
    add(f3_tool97_1.part, mode=Mode.SUBTRACT)


solid = f1_15.part
